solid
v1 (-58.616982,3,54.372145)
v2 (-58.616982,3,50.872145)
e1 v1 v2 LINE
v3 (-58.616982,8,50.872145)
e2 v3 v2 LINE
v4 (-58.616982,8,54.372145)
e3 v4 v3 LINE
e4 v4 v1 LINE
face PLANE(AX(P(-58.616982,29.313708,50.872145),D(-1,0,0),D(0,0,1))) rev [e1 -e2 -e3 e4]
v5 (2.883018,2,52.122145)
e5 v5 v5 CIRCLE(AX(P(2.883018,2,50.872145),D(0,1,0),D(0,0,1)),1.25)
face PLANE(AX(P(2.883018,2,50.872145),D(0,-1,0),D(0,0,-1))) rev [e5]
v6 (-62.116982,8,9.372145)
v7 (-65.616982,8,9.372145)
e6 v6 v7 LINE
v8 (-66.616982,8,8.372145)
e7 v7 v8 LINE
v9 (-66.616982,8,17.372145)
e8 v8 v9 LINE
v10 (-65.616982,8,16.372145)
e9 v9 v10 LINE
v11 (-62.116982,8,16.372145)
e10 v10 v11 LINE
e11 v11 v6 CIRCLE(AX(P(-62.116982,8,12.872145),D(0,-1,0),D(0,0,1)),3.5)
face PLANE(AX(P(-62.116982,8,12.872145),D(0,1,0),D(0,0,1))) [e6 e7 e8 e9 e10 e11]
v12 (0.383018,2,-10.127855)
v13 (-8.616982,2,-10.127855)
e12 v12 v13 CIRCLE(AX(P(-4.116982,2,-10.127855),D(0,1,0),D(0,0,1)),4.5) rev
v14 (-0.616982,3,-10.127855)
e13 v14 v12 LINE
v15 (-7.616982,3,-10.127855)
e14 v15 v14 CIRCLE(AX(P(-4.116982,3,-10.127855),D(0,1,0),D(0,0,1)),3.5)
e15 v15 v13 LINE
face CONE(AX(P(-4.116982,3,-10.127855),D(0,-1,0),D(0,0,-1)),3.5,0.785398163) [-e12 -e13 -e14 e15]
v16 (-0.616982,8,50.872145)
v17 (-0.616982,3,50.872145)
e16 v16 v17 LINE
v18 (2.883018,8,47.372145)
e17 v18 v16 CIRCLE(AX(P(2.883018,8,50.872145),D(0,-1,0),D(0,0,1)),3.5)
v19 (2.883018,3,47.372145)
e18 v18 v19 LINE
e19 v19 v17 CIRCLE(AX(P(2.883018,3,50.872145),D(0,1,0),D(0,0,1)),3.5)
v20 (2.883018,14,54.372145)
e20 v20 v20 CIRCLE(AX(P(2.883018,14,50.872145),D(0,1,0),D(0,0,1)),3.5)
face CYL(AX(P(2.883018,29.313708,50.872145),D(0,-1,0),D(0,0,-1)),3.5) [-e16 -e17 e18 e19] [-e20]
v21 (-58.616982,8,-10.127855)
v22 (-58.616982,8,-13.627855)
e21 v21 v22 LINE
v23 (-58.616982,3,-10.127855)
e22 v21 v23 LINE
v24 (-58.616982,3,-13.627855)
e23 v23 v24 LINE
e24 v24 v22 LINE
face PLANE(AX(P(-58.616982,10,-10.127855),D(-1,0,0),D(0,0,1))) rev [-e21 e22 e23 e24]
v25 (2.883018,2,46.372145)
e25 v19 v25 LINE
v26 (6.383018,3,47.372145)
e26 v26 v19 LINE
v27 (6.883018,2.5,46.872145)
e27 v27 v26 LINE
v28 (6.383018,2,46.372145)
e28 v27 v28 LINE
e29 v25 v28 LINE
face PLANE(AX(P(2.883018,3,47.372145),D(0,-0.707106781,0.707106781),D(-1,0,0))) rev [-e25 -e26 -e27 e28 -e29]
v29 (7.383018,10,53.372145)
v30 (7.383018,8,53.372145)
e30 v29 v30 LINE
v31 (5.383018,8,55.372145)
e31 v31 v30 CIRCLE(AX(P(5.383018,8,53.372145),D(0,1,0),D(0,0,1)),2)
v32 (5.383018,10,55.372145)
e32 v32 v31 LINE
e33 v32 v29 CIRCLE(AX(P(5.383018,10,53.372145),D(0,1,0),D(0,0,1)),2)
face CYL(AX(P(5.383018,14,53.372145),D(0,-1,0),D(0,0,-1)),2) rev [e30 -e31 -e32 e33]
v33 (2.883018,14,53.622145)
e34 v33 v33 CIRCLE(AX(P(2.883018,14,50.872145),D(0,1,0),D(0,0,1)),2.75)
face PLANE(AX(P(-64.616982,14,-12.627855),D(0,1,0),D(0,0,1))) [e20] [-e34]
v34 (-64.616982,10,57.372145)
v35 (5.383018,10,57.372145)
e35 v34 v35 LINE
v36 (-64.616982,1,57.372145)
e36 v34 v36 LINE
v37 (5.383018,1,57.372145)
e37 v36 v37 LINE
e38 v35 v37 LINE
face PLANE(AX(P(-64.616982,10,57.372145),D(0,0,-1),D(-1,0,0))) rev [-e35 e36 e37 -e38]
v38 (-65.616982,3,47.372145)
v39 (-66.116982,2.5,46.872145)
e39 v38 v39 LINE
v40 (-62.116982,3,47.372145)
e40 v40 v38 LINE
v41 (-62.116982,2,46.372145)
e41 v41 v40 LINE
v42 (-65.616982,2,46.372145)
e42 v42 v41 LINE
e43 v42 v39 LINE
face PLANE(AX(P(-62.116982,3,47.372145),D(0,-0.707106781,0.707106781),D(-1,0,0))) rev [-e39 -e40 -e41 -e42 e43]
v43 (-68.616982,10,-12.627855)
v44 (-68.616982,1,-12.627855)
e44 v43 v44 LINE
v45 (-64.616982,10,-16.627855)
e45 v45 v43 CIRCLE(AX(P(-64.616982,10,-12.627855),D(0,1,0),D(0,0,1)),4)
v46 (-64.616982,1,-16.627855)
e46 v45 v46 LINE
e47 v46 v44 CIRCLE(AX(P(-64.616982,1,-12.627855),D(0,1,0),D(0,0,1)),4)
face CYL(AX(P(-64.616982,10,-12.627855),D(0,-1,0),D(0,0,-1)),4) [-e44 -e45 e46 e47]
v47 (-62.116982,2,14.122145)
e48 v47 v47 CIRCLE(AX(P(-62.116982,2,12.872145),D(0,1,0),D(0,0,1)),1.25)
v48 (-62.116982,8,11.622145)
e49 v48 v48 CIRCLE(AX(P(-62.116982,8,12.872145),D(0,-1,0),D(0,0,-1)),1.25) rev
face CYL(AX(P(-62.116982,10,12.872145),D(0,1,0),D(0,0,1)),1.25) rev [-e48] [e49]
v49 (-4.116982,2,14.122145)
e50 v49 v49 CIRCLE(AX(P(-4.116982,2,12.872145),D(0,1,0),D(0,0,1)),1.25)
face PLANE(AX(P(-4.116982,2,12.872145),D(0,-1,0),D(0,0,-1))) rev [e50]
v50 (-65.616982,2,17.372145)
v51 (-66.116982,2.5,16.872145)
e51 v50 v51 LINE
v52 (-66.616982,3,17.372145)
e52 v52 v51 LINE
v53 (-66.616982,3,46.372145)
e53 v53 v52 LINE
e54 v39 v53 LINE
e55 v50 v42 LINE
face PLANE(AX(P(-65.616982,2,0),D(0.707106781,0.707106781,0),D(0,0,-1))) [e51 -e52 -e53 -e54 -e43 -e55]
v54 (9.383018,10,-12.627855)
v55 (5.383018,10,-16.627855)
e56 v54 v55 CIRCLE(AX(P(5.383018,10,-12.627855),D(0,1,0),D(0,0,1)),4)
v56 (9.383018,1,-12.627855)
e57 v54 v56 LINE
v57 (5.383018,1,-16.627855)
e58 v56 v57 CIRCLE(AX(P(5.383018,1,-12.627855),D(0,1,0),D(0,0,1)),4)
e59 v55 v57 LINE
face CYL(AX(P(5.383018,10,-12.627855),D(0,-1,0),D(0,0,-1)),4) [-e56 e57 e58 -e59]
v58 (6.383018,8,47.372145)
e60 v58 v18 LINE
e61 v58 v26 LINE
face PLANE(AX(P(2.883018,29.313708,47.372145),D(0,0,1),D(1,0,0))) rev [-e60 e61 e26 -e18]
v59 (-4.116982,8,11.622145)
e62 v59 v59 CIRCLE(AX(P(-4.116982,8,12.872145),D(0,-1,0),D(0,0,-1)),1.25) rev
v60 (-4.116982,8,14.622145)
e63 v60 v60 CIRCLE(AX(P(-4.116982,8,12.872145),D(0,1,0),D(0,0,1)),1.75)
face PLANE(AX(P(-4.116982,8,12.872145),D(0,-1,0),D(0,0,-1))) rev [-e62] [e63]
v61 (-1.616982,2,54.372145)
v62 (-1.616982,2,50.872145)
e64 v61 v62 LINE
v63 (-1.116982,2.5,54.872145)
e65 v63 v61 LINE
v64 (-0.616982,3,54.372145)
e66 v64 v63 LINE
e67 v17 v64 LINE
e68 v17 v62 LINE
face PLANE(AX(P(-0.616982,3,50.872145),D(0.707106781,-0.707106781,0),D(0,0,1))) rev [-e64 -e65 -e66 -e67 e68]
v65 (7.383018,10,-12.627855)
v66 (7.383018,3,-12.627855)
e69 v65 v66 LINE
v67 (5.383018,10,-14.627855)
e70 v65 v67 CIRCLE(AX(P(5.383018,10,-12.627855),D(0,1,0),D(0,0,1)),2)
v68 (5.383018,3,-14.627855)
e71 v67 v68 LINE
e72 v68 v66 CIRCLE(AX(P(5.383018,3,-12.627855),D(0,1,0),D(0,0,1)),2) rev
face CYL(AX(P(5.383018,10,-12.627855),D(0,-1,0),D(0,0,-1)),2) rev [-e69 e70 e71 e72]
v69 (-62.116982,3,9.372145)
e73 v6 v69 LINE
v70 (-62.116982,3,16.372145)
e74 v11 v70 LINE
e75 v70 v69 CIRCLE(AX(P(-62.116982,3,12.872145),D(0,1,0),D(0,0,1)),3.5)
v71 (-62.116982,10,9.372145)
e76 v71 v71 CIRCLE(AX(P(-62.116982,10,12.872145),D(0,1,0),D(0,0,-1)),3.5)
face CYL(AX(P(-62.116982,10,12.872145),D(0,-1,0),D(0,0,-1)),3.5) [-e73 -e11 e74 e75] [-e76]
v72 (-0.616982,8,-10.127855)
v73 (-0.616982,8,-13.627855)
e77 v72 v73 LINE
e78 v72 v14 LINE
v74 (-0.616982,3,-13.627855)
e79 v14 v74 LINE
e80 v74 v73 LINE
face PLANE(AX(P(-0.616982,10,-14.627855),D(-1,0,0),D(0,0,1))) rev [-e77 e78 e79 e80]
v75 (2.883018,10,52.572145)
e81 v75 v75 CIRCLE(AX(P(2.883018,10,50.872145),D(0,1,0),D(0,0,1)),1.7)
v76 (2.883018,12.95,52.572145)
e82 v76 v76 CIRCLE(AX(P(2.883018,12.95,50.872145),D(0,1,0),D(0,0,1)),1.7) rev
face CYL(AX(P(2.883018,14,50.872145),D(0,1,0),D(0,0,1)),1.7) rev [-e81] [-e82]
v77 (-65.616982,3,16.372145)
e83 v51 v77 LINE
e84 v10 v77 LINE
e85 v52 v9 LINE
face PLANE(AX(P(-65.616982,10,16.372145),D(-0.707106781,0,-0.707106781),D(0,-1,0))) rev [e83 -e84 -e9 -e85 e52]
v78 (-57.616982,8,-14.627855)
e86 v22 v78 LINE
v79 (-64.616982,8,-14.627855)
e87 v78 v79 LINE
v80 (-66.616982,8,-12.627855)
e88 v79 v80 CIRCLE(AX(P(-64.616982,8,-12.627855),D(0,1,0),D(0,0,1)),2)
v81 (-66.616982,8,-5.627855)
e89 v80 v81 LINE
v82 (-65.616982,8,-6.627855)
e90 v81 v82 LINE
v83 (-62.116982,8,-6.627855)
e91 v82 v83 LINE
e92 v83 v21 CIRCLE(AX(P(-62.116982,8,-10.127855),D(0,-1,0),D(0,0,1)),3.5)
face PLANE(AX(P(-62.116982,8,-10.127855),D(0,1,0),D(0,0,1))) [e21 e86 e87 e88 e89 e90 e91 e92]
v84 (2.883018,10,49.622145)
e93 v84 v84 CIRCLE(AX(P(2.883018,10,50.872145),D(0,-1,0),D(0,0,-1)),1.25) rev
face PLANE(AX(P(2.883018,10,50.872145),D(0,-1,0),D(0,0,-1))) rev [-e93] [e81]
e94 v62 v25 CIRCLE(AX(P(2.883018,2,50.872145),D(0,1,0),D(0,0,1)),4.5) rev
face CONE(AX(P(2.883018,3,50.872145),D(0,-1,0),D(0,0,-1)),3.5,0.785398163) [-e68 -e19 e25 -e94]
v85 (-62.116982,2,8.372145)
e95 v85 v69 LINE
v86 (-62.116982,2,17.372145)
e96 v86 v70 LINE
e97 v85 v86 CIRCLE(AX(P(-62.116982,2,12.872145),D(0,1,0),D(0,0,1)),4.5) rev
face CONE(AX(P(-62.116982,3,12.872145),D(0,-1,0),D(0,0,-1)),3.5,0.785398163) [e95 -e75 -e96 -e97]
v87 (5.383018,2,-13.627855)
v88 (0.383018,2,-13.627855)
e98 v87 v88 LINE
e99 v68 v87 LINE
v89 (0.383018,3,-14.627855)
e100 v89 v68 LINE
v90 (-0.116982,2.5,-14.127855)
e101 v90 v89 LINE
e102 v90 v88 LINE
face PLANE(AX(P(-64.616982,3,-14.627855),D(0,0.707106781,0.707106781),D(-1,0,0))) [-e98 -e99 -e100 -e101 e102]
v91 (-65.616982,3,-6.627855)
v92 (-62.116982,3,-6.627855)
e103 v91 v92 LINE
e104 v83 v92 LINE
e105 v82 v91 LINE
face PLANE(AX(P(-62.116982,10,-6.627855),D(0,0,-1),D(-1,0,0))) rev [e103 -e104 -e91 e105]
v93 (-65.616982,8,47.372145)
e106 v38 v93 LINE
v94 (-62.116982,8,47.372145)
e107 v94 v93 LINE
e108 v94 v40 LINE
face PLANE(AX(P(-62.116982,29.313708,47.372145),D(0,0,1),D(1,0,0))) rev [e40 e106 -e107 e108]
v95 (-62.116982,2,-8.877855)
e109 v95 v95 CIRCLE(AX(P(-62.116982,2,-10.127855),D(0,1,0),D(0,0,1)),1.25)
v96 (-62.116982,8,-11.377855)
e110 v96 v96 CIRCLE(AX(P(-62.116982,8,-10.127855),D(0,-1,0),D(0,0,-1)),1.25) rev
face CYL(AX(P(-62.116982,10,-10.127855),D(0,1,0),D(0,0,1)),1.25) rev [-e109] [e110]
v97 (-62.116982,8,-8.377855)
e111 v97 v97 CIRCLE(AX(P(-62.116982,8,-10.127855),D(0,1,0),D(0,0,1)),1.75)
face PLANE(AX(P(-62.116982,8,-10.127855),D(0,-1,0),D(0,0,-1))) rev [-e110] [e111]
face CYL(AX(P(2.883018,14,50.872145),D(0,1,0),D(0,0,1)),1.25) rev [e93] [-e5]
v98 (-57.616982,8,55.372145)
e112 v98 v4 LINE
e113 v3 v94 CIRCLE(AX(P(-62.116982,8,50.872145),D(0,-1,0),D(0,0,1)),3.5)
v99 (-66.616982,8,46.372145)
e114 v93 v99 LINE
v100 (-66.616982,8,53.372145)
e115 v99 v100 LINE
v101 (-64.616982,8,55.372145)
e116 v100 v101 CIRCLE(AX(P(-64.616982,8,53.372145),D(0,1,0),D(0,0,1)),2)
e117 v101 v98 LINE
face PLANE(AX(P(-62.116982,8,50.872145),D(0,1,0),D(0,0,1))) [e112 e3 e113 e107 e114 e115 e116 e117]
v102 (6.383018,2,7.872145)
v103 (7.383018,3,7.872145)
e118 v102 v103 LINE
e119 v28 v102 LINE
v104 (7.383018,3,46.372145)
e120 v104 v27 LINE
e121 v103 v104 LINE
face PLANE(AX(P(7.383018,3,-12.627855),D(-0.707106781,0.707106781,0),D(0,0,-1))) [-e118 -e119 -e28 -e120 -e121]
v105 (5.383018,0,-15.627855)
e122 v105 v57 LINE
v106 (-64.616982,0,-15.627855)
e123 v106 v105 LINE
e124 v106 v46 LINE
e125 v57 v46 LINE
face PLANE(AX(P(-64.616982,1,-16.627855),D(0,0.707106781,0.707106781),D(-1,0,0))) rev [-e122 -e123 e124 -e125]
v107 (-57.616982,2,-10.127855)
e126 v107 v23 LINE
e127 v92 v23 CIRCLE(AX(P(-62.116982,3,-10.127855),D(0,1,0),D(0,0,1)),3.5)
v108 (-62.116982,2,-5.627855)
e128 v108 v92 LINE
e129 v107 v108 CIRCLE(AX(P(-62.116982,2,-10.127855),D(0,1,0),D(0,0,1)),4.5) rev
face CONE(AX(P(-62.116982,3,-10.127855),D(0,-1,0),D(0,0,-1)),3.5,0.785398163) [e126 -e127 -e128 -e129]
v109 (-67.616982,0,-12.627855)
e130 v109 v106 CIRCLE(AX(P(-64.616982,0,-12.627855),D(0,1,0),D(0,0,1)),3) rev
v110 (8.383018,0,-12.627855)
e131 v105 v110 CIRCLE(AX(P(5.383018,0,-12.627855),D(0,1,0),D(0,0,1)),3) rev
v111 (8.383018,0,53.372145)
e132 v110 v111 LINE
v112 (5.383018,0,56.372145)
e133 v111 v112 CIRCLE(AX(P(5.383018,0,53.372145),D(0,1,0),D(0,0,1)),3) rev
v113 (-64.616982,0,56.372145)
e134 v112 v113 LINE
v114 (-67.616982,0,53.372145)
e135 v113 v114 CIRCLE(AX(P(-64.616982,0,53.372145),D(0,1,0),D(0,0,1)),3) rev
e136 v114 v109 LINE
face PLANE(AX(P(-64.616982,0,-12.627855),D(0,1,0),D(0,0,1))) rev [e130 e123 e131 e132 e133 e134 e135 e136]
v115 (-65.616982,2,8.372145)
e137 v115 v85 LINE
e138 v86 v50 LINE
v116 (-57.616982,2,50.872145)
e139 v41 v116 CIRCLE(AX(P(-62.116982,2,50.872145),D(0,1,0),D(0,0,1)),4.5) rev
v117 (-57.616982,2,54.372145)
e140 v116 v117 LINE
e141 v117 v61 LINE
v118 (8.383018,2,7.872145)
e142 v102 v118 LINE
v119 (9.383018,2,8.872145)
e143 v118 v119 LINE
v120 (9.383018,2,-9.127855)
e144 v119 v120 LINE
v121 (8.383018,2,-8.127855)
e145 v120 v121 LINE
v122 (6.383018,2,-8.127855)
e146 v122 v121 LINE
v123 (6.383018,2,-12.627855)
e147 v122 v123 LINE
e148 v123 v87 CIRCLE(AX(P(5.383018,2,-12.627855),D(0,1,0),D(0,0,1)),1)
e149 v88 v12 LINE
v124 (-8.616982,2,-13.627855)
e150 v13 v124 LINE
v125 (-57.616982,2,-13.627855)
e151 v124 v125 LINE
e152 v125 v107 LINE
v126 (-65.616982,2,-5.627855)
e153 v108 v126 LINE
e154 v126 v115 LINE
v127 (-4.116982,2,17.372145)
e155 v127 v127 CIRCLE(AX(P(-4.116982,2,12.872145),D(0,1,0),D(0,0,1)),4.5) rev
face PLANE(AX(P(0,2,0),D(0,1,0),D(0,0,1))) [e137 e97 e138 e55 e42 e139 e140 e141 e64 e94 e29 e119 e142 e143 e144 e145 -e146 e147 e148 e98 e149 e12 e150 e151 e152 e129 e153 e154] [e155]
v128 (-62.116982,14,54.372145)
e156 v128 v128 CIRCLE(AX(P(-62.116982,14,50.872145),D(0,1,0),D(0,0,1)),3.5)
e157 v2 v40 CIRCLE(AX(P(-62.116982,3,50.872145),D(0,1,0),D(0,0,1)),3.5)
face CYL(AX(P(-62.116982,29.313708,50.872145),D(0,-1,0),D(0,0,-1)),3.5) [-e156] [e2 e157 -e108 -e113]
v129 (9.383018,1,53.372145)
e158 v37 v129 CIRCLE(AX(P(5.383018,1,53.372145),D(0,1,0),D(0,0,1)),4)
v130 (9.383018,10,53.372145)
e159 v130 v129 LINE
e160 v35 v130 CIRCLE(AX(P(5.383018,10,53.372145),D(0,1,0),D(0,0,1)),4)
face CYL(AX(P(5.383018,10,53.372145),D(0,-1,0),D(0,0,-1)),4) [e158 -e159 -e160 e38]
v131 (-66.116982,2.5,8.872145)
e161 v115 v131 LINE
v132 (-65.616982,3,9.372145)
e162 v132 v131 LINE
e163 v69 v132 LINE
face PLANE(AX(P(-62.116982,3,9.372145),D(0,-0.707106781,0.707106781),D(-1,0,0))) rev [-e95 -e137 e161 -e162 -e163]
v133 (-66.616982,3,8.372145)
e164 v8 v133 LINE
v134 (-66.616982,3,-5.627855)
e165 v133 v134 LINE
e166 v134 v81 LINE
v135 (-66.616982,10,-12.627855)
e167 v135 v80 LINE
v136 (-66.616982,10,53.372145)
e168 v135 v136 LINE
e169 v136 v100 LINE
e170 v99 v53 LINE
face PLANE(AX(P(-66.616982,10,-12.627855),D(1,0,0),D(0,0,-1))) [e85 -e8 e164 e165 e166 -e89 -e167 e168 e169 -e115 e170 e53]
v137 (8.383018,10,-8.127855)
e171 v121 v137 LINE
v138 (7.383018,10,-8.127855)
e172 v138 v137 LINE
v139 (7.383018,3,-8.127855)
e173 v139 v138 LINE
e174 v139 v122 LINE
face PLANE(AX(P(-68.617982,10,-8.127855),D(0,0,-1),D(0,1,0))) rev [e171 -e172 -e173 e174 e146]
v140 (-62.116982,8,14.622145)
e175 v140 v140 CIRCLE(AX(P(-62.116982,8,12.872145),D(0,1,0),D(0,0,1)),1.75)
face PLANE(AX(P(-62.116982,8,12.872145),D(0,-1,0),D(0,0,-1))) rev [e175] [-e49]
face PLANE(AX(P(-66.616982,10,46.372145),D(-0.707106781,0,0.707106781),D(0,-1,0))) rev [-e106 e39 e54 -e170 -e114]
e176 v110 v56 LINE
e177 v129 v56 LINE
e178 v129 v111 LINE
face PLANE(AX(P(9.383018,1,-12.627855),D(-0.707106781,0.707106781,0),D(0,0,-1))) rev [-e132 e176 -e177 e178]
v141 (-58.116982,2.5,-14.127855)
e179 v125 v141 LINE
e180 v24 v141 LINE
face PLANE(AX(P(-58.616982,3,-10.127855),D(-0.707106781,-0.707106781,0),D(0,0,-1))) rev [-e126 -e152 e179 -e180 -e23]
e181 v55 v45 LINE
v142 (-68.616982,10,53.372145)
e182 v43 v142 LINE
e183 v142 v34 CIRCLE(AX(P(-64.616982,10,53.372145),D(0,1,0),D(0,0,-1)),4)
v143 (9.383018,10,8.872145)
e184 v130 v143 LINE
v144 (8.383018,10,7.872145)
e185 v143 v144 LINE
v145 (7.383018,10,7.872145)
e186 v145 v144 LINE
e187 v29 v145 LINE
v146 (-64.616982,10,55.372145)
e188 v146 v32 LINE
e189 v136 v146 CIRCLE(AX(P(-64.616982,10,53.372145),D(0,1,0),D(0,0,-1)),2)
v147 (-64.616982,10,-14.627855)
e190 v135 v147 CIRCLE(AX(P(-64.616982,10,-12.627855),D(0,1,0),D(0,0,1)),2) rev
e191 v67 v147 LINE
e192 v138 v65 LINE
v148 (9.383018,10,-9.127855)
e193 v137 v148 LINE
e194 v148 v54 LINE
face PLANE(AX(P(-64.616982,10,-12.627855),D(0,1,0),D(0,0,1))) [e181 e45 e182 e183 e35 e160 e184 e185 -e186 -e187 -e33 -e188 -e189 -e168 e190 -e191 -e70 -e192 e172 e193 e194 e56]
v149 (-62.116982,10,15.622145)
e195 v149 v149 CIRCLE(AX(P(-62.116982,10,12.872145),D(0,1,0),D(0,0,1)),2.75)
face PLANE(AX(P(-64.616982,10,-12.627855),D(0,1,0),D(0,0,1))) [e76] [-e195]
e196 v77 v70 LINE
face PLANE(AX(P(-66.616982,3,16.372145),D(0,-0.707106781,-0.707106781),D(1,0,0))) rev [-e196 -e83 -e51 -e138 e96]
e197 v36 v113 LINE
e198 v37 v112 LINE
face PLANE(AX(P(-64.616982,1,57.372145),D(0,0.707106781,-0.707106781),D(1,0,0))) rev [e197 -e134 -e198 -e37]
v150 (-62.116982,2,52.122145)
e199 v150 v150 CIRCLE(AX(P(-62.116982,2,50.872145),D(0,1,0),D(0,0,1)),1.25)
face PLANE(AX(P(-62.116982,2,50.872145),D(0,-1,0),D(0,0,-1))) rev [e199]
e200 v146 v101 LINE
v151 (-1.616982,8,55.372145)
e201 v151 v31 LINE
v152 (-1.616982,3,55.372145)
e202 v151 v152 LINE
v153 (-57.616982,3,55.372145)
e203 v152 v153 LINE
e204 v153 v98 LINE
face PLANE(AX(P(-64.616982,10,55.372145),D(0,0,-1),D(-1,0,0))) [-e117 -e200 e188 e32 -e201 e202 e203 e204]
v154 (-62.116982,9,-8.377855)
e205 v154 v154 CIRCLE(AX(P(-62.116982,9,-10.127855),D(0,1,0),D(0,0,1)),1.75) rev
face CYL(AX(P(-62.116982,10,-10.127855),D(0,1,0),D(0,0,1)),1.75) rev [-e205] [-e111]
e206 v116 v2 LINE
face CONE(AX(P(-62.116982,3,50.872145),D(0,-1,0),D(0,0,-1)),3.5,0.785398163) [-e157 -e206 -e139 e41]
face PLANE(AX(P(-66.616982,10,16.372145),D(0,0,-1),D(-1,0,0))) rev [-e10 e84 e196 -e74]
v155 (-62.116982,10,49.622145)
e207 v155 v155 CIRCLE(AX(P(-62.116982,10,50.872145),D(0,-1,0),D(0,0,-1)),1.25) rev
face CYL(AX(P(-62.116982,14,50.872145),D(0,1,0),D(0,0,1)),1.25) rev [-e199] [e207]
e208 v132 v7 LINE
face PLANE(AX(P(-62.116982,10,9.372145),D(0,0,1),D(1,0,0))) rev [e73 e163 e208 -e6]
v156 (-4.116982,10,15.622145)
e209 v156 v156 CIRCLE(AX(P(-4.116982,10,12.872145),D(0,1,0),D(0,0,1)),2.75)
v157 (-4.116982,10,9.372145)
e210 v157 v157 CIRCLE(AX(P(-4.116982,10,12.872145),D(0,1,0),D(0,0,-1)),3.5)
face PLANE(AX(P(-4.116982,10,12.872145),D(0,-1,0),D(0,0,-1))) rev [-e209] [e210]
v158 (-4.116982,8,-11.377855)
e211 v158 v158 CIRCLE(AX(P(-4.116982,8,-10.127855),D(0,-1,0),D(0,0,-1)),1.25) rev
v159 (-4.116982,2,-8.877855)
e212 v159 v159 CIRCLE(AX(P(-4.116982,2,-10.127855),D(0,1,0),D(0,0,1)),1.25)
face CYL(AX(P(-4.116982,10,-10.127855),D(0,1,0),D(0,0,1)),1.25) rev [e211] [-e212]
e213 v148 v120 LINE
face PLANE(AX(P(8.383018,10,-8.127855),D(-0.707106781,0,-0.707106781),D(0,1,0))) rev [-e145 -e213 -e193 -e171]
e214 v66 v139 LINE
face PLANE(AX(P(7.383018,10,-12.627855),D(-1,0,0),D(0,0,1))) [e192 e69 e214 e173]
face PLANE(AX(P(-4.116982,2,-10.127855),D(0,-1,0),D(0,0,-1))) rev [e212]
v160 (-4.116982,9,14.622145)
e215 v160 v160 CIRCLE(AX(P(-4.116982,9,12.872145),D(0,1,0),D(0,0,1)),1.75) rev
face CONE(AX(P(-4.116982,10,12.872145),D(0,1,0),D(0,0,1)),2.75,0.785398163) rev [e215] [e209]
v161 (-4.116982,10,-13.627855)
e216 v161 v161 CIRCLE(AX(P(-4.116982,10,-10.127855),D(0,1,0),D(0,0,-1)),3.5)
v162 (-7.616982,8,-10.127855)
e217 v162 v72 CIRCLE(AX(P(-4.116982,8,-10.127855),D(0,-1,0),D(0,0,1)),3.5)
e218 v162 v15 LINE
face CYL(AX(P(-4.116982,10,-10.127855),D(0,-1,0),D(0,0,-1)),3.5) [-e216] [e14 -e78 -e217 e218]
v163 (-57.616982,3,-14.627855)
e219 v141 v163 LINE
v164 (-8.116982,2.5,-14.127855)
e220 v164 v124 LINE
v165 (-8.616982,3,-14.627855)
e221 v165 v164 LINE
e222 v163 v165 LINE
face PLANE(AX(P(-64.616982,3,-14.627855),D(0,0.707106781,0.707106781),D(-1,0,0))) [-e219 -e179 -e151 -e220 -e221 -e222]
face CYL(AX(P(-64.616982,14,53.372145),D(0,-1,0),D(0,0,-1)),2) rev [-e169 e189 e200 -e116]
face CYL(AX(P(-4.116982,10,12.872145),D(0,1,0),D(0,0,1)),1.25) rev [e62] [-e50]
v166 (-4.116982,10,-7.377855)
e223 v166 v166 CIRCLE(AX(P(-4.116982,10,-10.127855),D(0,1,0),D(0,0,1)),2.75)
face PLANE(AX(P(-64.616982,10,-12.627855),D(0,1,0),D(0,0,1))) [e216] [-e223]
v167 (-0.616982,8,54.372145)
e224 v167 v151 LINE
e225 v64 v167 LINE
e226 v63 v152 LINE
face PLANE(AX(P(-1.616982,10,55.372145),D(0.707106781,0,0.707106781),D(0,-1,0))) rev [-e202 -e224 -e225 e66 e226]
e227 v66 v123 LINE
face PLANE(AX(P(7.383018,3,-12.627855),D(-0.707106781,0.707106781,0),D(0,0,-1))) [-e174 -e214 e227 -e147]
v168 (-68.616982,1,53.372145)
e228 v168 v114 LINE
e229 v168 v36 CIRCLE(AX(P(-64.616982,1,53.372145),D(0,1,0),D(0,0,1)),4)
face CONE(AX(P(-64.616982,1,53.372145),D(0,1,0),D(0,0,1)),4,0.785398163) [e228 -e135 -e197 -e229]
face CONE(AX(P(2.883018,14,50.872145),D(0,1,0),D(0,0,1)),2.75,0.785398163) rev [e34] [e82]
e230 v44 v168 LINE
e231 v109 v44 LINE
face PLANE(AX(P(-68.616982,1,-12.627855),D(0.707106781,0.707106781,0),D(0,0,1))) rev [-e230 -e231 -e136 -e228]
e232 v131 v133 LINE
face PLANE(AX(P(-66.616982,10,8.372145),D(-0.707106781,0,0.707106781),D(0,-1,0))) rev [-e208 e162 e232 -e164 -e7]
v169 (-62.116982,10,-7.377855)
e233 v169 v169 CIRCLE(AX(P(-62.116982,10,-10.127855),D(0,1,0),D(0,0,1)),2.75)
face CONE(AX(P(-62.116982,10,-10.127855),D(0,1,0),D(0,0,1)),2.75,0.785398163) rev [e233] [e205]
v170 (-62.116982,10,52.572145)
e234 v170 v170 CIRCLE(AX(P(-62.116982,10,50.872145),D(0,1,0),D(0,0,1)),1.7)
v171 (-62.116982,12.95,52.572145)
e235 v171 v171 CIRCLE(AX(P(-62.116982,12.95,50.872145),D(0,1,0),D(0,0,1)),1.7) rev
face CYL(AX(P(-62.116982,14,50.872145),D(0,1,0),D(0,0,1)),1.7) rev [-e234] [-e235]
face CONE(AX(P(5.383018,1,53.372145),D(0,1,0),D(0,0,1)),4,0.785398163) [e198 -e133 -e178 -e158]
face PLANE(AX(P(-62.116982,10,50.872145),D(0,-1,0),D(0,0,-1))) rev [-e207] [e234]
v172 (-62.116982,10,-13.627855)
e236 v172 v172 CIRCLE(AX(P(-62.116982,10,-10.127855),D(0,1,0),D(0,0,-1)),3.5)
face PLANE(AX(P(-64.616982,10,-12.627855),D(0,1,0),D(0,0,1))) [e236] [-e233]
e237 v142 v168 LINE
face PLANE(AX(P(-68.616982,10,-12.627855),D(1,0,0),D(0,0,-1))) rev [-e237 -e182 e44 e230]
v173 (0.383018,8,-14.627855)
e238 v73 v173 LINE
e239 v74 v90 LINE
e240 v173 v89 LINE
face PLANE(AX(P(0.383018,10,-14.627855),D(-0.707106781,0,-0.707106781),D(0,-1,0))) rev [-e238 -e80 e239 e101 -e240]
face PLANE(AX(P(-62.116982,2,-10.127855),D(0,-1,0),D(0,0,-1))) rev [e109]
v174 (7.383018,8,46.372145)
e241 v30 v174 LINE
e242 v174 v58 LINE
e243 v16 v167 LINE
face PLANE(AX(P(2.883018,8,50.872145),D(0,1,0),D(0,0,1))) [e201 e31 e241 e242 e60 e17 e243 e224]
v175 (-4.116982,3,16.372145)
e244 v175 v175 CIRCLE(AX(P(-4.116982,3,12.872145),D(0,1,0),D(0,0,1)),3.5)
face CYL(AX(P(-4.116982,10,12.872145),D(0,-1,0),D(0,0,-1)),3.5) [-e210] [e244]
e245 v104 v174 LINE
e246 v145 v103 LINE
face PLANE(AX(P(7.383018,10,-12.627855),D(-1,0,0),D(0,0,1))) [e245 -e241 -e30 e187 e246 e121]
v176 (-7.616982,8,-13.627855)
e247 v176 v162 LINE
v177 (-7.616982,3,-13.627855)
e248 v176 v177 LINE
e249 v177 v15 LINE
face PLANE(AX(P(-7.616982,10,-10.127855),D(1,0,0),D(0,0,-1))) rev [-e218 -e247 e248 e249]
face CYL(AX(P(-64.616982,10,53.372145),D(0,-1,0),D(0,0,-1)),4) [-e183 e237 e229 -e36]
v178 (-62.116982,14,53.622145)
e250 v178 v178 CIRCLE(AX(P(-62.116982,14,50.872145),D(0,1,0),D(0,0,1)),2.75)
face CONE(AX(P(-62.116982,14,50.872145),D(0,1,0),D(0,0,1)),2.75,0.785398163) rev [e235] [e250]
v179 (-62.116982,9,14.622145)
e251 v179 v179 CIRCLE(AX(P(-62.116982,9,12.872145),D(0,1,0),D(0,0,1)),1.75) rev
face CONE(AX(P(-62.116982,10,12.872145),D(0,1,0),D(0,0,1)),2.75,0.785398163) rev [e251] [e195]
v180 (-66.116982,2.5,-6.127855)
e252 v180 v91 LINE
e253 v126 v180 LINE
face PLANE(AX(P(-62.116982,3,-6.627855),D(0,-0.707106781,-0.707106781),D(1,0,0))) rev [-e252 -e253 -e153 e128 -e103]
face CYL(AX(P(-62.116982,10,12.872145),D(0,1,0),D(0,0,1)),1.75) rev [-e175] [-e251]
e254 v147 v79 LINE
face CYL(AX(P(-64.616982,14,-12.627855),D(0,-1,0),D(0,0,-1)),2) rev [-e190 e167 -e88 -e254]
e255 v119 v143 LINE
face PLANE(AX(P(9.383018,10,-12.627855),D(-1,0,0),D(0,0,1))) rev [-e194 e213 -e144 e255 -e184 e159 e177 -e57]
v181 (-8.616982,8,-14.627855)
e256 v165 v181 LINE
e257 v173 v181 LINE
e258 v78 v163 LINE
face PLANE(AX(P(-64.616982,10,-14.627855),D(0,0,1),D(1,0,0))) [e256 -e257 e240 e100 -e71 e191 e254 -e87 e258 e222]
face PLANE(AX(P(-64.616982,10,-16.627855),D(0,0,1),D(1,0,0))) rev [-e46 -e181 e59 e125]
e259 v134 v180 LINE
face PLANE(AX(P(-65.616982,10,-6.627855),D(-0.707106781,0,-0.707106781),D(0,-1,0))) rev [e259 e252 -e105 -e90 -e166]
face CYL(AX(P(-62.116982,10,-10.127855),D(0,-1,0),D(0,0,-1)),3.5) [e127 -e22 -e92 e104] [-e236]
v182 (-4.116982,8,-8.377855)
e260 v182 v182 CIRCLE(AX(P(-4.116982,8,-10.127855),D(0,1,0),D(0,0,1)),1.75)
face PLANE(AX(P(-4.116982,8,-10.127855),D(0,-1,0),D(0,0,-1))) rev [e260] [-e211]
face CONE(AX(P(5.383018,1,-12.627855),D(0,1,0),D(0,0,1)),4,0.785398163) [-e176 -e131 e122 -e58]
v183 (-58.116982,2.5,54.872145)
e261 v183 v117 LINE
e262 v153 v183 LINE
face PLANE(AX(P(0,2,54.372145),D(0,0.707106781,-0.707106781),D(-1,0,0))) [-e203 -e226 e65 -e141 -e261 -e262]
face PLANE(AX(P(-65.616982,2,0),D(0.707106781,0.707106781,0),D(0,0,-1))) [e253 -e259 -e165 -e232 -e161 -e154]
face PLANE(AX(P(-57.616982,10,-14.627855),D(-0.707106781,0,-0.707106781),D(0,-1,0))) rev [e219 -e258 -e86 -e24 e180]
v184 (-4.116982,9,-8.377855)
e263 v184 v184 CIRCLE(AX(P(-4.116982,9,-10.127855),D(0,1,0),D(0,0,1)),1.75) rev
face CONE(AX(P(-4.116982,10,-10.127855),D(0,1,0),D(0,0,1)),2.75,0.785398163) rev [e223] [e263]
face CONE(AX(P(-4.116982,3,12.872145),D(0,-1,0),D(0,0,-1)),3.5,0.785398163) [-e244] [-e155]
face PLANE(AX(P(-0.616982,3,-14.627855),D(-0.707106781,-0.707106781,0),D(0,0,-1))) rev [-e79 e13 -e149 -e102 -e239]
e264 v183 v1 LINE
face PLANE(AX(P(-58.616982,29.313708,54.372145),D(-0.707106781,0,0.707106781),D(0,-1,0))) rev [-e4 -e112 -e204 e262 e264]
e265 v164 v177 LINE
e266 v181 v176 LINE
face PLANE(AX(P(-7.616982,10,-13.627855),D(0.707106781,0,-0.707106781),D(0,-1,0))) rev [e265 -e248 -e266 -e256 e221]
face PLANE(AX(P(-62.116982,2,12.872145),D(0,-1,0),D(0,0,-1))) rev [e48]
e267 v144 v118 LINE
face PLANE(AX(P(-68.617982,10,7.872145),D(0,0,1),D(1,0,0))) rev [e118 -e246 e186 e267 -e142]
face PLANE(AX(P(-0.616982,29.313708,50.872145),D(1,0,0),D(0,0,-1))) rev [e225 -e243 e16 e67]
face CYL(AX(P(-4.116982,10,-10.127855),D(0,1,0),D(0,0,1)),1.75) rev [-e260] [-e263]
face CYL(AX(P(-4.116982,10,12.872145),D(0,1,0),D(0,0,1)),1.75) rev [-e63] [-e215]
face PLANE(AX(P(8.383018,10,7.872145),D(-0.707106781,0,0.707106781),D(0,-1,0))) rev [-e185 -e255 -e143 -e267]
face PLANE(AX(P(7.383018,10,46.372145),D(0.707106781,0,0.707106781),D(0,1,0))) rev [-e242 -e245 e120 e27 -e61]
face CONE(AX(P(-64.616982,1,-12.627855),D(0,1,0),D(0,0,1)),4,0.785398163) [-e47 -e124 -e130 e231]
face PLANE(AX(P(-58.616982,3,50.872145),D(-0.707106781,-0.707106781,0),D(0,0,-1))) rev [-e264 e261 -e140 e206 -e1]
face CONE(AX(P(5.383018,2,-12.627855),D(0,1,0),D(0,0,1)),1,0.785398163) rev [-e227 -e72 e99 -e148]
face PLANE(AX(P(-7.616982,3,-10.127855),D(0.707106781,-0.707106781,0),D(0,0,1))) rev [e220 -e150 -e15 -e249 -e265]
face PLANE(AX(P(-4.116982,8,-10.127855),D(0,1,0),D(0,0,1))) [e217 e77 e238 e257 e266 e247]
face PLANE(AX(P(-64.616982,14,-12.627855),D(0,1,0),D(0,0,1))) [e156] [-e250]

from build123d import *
from build123d.topology import SkipClean

# Parameters (mm, degrees)
BOSS_EXTRUDE1_DEPTH                  = 10
BOSS_EXTRUDE2_DEPTH                  = 2
SKETCH4_R                            = 3.5
BOSS_EXTRUDE3_DEPTH                  = 8
BOSS_EXTRUDE4_DEPTH                  = 12
CHAMFER3_SIZE                        = 1
CUT_EXTRUDE2_DEPTH                   = 4
CUT_EXTRUDE2_DEPTH_BACK              = 2
CHAMFER4_SIZE                        = 1
CHAMFER5_SIZE                        = 1
F_2_5_2_5_DIAMETER_HOLE1_D           = 2.5
F_2_5_2_5_DIAMETER_HOLE1_DEPTH       = 8
F_2_5_2_5_DIAMETER_HOLE1_CSINK_D     = 5.5
F_2_5_2_5_DIAMETER_HOLE1_CSINK_ANGLE = 90
F_3_5_3_5_DIAMETER_HOLE1_D           = 3.5
F_3_5_3_5_DIAMETER_HOLE1_DEPTH       = 2
F_2_5_2_5_DIAMETER_HOLE2_D           = 2.5
F_2_5_2_5_DIAMETER_HOLE2_DEPTH       = 12
F_2_5_2_5_DIAMETER_HOLE2_CSINK_D     = 5.5
F_2_5_2_5_DIAMETER_HOLE2_CSINK_ANGLE = 90
F_3_4_3_4_DIAMETER_HOLE1_D           = 3.4
F_3_4_3_4_DIAMETER_HOLE1_DEPTH       = 4
CUT_EXTRUDE3_REACH                   = 99.834
SKETCH21_W                           = 16
SKETCH21_H                           = 8
CHAMFER9_SIZE                        = 1


with BuildPart() as part:
    # Sketch2 → Boss-Extrude1 (new body)
    with BuildSketch(Plane(origin=(0, 0, 0), x_dir=(1, 0, 0), z_dir=(0, 1, 0))):
        with BuildLine():
            Line((-68.616981764, 12.627854819), (-68.616981764, -53.372145181))
            ThreePointArc((-68.616981764, -53.372145181), (-67.445408889, -56.200572306), (-64.616981764, -57.372145181))
            Line((-64.616981764, -57.372145181), (5.383018236, -57.372145181))
            ThreePointArc((5.383018236, -57.372145181), (8.211445361, -56.200572306), (9.383018236, -53.372145181))
            Line((9.383018236, -53.372145181), (9.383018236, 12.627854819))
            ThreePointArc((9.383018236, 12.627854819), (8.211445361, 15.456281944), (5.383018236, 16.627854819))
            Line((5.383018236, 16.627854819), (-64.616981764, 16.627854819))
            ThreePointArc((-64.616981764, 16.627854819), (-67.445408889, 15.456281944), (-68.616981764, 12.627854819))
        make_face()
        with BuildLine():
            Line((-66.616981764, 12.627854819), (-66.616981764, -53.372145181))
            ThreePointArc((-66.616981764, -53.372145181), (-66.031195326, -54.786358744), (-64.616981764, -55.372145181))
            Line((-64.616981764, -55.372145181), (5.383018236, -55.372145181))
            ThreePointArc((5.383018236, -55.372145181), (6.797231798, -54.786358744), (7.383018236, -53.372145181))
            Line((7.383018236, -53.372145181), (7.383018236, 12.627854819))
            ThreePointArc((7.383018236, 12.627854819), (6.797231798, 14.042068381), (5.383018236, 14.627854819))
            Line((5.383018236, 14.627854819), (-64.616981764, 14.627854819))
            ThreePointArc((-64.616981764, 14.627854819), (-66.031195326, 14.042068381), (-66.616981764, 12.627854819))
        make_face(mode=Mode.SUBTRACT)
    extrude(amount=BOSS_EXTRUDE1_DEPTH)

    # Sketch2<3> → Boss-Extrude2 (add)
    with BuildSketch(Plane(origin=(0, 0, 0), x_dir=(1, 0, 0), z_dir=(0, 1, 0))):
        with BuildLine():
            Line((-64.616981764, 14.627854819), (5.383018236, 14.627854819))
            ThreePointArc((5.383018236, 14.627854819), (6.797231798, 14.042068381), (7.383018236, 12.627854819))
            Line((7.383018236, 12.627854819), (7.383018236, -53.372145181))
            ThreePointArc((7.383018236, -53.372145181), (6.797231798, -54.786358744), (5.383018236, -55.372145181))
            Line((5.383018236, -55.372145181), (-64.616981764, -55.372145181))
            ThreePointArc((-64.616981764, -55.372145181), (-66.031195326, -54.786358744), (-66.616981764, -53.372145181))
            Line((-66.616981764, -53.372145181), (-66.616981764, 12.627854819))
            ThreePointArc((-66.616981764, 12.627854819), (-66.031195326, 14.042068381), (-64.616981764, 14.627854819))
        make_face()
    extrude(amount=BOSS_EXTRUDE2_DEPTH)

    # Sketch4 → Boss-Extrude3 (add)
    with BuildSketch(Plane(origin=(0, 2, 0), x_dir=(1, 0, 0), z_dir=(0, 1, 0))):
        with Locations(Location((-4.116981764, -12.872145181, 0), (0, 0, 90))):
            Circle(SKETCH4_R)
        with BuildLine():
            Line((-0.616981764, 14.627854819), (-0.616981764, 10.127854819))
            ThreePointArc((-0.616981764, 10.127854819), (-4.116981764, 6.627854819), (-7.616981764, 10.127854819))
            Line((-7.616981764, 10.127854819), (-7.616981764, 14.627854819))
            Line((-7.616981764, 14.627854819), (-0.616981764, 14.627854819))
        make_face()
        with BuildLine():
            Line((-66.616981764, -16.372145181), (-62.116981764, -16.372145181))
            ThreePointArc((-62.116981764, -16.372145181), (-58.616981764, -12.872145181), (-62.116981764, -9.372145181))
            Line((-62.116981764, -9.372145181), (-66.616981764, -9.372145181))
            Line((-66.616981764, -9.372145181), (-66.616981764, -16.372145181))
        make_face()
        with BuildLine():
            Line((-58.616981764, 14.627854819), (-64.616981764, 14.627854819))
            ThreePointArc((-64.616981764, 14.627854819), (-66.031195326, 14.042068381), (-66.616981764, 12.627854819))
            Line((-66.616981764, 12.627854819), (-66.616981764, 6.627854819))
            Line((-66.616981764, 6.627854819), (-62.116981764, 6.627854819))
            ThreePointArc((-62.116981764, 6.627854819), (-59.64210803, 7.652981085), (-58.616981764, 10.127854819))
            Line((-58.616981764, 10.127854819), (-58.616981764, 14.627854819))
        make_face()
    extrude(amount=BOSS_EXTRUDE3_DEPTH)

    # Sketch9 → Boss-Extrude4 (add)
    with BuildSketch(Plane(origin=(0, 2, 0), x_dir=(1, 0, 0), z_dir=(0, 1, 0))):
        with BuildLine():
            Line((-62.116981764, -47.372145181), (-66.616981764, -47.372145181))
            Line((-66.616981764, -47.372145181), (-66.616981764, -53.372145181))
            ThreePointArc((-66.616981764, -53.372145181), (-66.031195326, -54.786358744), (-64.616981764, -55.372145181))
            Line((-64.616981764, -55.372145181), (-58.616981764, -55.372145181))
            Line((-58.616981764, -55.372145181), (-58.616981764, -50.872145181))
            ThreePointArc((-58.616981764, -50.872145181), (-59.64210803, -48.397271447), (-62.116981764, -47.372145181))
        make_face()
        with BuildLine():
            Line((2.883018236, -47.372145181), (7.383018236, -47.372145181))
            Line((7.383018236, -47.372145181), (7.383018236, -53.372145181))
            ThreePointArc((7.383018236, -53.372145181), (6.797231798, -54.786358744), (5.383018236, -55.372145181))
            Line((5.383018236, -55.372145181), (-0.616981764, -55.372145181))
            Line((-0.616981764, -55.372145181), (-0.616981764, -50.872145181))
            ThreePointArc((-0.616981764, -50.872145181), (0.408144502, -48.397271447), (2.883018236, -47.372145181))
        make_face()
    extrude(amount=BOSS_EXTRUDE4_DEPTH)

    # Chamfer3
    chamfer3_edges = [part.edges().sort_by_distance(p)[0] for p in [
        (-68.616981764, 0, 20.372145181),
        (-67.445408889, 0, -15.456281944),
        (-29.616981764, 0, -16.627854819),
        (8.211445361, 0, -15.456281944),
        (9.383018236, 0, 20.372145181),
        (8.211445361, 0, 56.200572306),
        (-29.616981764, 0, 57.372145181),
        (-67.445408889, 0, 56.200572306),
    ]]
    chamfer(chamfer3_edges, length=CHAMFER3_SIZE)

    # Sketch12 → Cut-Extrude2 (cut, two sides: drawn at the far end of the back side and taken through both)
    with SkipClean():  # the faces are left unmerged after this step: merging them gives an invalid solid
        with BuildSketch(Plane(origin=(0, 10, 0), x_dir=(1, 0, 0), z_dir=(0, 1, 0)).offset(-CUT_EXTRUDE2_DEPTH_BACK)):
            with BuildLine():
                Line((-58.616981764, 10.127854819), (-58.616981764, 14.627854819))
                Line((-58.616981764, 14.627854819), (-64.616981764, 14.627854819))
                ThreePointArc((-64.616981764, 14.627854819), (-66.031195326, 14.042068381), (-66.616981764, 12.627854819))
                Line((-66.616981764, 12.627854819), (-66.616981764, 6.627854819))
                Line((-66.616981764, 6.627854819), (-62.116981764, 6.627854819))
                ThreePointArc((-62.116981764, 6.627854819), (-64.591855498, 12.602728553), (-58.616981764, 10.127854819))
            make_face()
            with BuildLine():
                Line((-64.616981764, -55.372145181), (-58.616981764, -55.372145181))
                Line((-58.616981764, -55.372145181), (-58.616981764, -50.872145181))
                ThreePointArc((-58.616981764, -50.872145181), (-64.591855498, -53.347018915), (-62.116981764, -47.372145181))
                Line((-62.116981764, -47.372145181), (-66.616981764, -47.372145181))
                Line((-66.616981764, -47.372145181), (-66.616981764, -53.372145181))
                ThreePointArc((-66.616981764, -53.372145181), (-66.031195326, -54.786358744), (-64.616981764, -55.372145181))
            make_face()
            with BuildLine():
                Line((-0.616981764, -50.872145181), (-0.616981764, -55.372145181))
                Line((-0.616981764, -55.372145181), (5.383018236, -55.372145181))
                ThreePointArc((5.383018236, -55.372145181), (6.797231798, -54.786358744), (7.383018236, -53.372145181))
                Line((7.383018236, -53.372145181), (7.383018236, -47.372145181))
                Line((7.383018236, -47.372145181), (2.883018236, -47.372145181))
                ThreePointArc((2.883018236, -47.372145181), (5.35789197, -53.347018915), (-0.616981764, -50.872145181))
            make_face()
            with BuildLine():
                Line((-7.616981764, 10.127854819), (-7.616981764, 14.627854819))
                Line((-7.616981764, 14.627854819), (-0.616981764, 14.627854819))
                Line((-0.616981764, 14.627854819), (-0.616981764, 10.127854819))
                ThreePointArc((-0.616981764, 10.127854819), (-4.116981764, 13.627854819), (-7.616981764, 10.127854819))
            make_face()
            with BuildLine():
                Line((-66.616981764, -16.372145181), (-66.616981764, -9.372145181))
                Line((-66.616981764, -9.372145181), (-62.116981764, -9.372145181))
                ThreePointArc((-62.116981764, -9.372145181), (-65.616981764, -12.872145181), (-62.116981764, -16.372145181))
                Line((-62.116981764, -16.372145181), (-66.616981764, -16.372145181))
            make_face()
        extrude(amount=CUT_EXTRUDE2_DEPTH + CUT_EXTRUDE2_DEPTH_BACK, mode=Mode.SUBTRACT)

    # Chamfer4
    # the kernel refuses this chamfer: 1 mm, written as the material it adds along each edge
    with BuildSketch(Plane(origin=(7.383018236, 2, 47.372145181), x_dir=(0.027495876610586414, 0, -0.9996219169112968), z_dir=(0, 1, 0)), Plane(origin=(-66.616981764, 2, -6.627854819), x_dir=(-0.02749587661058217, 0, 0.9996219169112968), z_dir=(0, 1, 0)), Plane(origin=(-58.616981764, 2, 55.372145181), x_dir=(0.9996219169112968, 0, 0.027495876610589005), z_dir=(0, 1, 0)), Plane(origin=(-7.616981764, 2, -14.627854819), x_dir=(-0.9996219169112968, 0, -0.027495876610585623), z_dir=(0, 1, 0)), Plane(origin=(-66.616981764, 2, 16.372145181), x_dir=(-0.027495876610582105, 0, 0.999621916911297), z_dir=(0, 1, 0))) as chamfer4_piece_1:
        Polygon((CHAMFER4_SIZE * 0.999621916911, CHAMFER4_SIZE * 0.0274958766106), (-CHAMFER4_SIZE * 0.0274958766106, CHAMFER4_SIZE * 0.999621916911), (0, 0), align=None)
    extrude(amount=6)
    with BuildSketch(Plane(origin=(-58.616981764, 2, -14.627854819), x_dir=(0.9996219169112968, 0, -0.02749587661058555), z_dir=(0, 1, 0)), Plane(origin=(-66.616981764, 2, 47.372145181), x_dir=(-0.027495876610582105, 0, -0.999621916911297), z_dir=(0, 1, 0)), Plane(origin=(-0.616981764, 2, 55.372145181), x_dir=(-0.9996219169112965, 0, 0.027495876610589158), z_dir=(0, 1, 0)), Plane(origin=(-0.616981764, 2, -14.627854819), x_dir=(0.9996219169112968, 0, -0.027495876610585623), z_dir=(0, 1, 0)), Plane(origin=(-66.616981764, 2, 9.372145181), x_dir=(-0.0274958766105822, 0, -0.999621916911297), z_dir=(0, 1, 0))) as chamfer4_piece_2:
        Polygon((CHAMFER4_SIZE * 0.999621916911, -CHAMFER4_SIZE * 0.0274958766106), (-CHAMFER4_SIZE * 0.0274958766106, -CHAMFER4_SIZE * 0.999621916911), (0, 0), align=None)
    extrude(amount=6)

    # Chamfer5
    # the kernel refuses this chamfer: 1 mm, written as the material it adds along each edge
    with BuildSketch(Plane(origin=(-58.616981764, 2, 56.943828169), x_dir=(-0.02749587661058907, 0.9996219169112965, 0), z_dir=(0, 0, -1)), Plane(origin=(-62.116981764, 2, 47.372145181), x_dir=(0, 0.9996219169112968, 0.027495876610589075), z_dir=(-1, 0, 0)), Plane(origin=(-7.616981764, 2, -10.127854819), x_dir=(-0.9996219169112968, -0.02749587661058627, 0), z_dir=(0, 0, -1)), Plane(origin=(-0.616981764, 2, -16.199537807), x_dir=(0.9996219169112968, -0.027495876610586487, 0), z_dir=(0, 0, 1)), Plane(origin=(-68.188664752, 2, -6.627854819), x_dir=(0, 0.9996219169112968, -0.027495876610586487), z_dir=(1, 0, 0)), Plane(origin=(-68.188664752, 2, 16.372145181), x_dir=(0, 0.9996219169112968, -0.027495876610585623), z_dir=(1, 0, 0)), Plane(origin=(-62.116981764, 2, 9.372145181), x_dir=(0, 0.9996219169112968, 0.027495876610585623), z_dir=(-1, 0, 0))) as chamfer5_piece_1:
        Polygon((CHAMFER5_SIZE * 0.999621916911, CHAMFER5_SIZE * 0.0274958766106), (-CHAMFER5_SIZE * 0.0274958766106, CHAMFER5_SIZE * 0.999621916911), (0, 0), align=None)
    extrude(amount=6.071682988)
    with BuildSketch(Plane(origin=(-62.116981764, 2, 50.872145181), x_dir=(1, 0, 0), z_dir=(0, 0, 1))) as chamfer5_piece_2:
        Polygon((3.5, CHAMFER5_SIZE), (3.5 + CHAMFER5_SIZE, 0), (3.5, 0), align=None)
    revolve(axis=Axis((-62.116981764, 2, 50.872145181), (0, 1, 0)), revolution_arc=90)
    with BuildSketch(Plane(origin=(0.954701224, 2, 55.372145181), x_dir=(0, 0.9996219169112968, 0.027495876610589075), z_dir=(-1, 0, 0))) as chamfer5_piece_3:
        Polygon((CHAMFER5_SIZE * 0.999621916911, CHAMFER5_SIZE * 0.0274958766106), (-CHAMFER5_SIZE * 0.0274958766106, CHAMFER5_SIZE * 0.999621916911), (0, 0), align=None)
    extrude(amount=61.143365976)
    with BuildSketch(Plane(origin=(2.883018236, 2, 47.372145181), x_dir=(0, 0.9996219169112968, 0.027495876610589075), z_dir=(1, 0, 0)), Plane(origin=(-0.616981764, 2, 56.943828169), x_dir=(0.02749587661058638, 0.9996219169112968, 0), z_dir=(0, 0, -1)), Plane(origin=(-58.616981764, 2, -10.127854819), x_dir=(0.9996219169112968, -0.0274958766105862, 0), z_dir=(0, 0, -1))) as chamfer5_piece_4:
        Polygon((CHAMFER5_SIZE * 0.999621916911, -CHAMFER5_SIZE * 0.0274958766106), (-CHAMFER5_SIZE * 0.0274958766106, -CHAMFER5_SIZE * 0.999621916911), (0, 0), align=None)
    extrude(amount=6.071682988)
    with BuildSketch(Plane(origin=(2.883018236, 2, 50.872145181), x_dir=(-1, 0, 0), z_dir=(0, 0, 1))) as chamfer5_piece_5:
        Polygon((3.5, -CHAMFER5_SIZE), (3.5 + CHAMFER5_SIZE, 0), (3.5, 0), align=None)
    revolve(axis=Axis((2.883018236, 2, 50.872145181), (0, -1, 0)), revolution_arc=90)
    with BuildSketch(Plane(origin=(-4.116981764, 2, 12.872145181), x_dir=(0, 0, -1), z_dir=(1, 0, 0))) as chamfer5_piece_6:
        Polygon((3.5 + CHAMFER5_SIZE, 0), (3.5, CHAMFER5_SIZE), (3.5, 0), align=None)
    revolve(axis=Axis((-4.116981764, 2, 12.872145181), (0, 1, 0)))
    with BuildSketch(Plane(origin=(7.383018236, 2, -12.627854819), x_dir=(0.02749587661059166, 0.9996219169112965, 0), z_dir=(0, 0, 1))) as chamfer5_piece_7:
        Polygon((CHAMFER5_SIZE * 0.999621916911, CHAMFER5_SIZE * 0.0274958766106), (-CHAMFER5_SIZE * 0.0274958766106, CHAMFER5_SIZE * 0.999621916911), (0, 0), align=None)
    extrude(amount=61.571682988)
    with BuildSketch(Plane(origin=(-2.188664752, 2, -14.627854819), x_dir=(0, -0.02749587661058651, 0.9996219169112968), z_dir=(1, 0, 0))) as chamfer5_piece_8:
        Polygon((CHAMFER5_SIZE * 0.999621916911, -CHAMFER5_SIZE * 0.0274958766106), (-CHAMFER5_SIZE * 0.0274958766106, -CHAMFER5_SIZE * 0.999621916911), (0, 0), align=None)
    extrude(amount=7.571682988)
    with BuildSketch(Plane(origin=(5.383018236, 2, -12.627854819), x_dir=(0, 0, -1), z_dir=(-1, 0, 0))) as chamfer5_piece_9:
        Polygon((2, -CHAMFER5_SIZE), (2 - CHAMFER5_SIZE, 0), (2, 0), align=None)
    revolve(axis=Axis((5.383018236, 2, -12.627854819), (0, -1, 0)), revolution_arc=90)
    with BuildSketch(Plane(origin=(-4.116981764, 2, -10.127854819), x_dir=(1, 0, 0), z_dir=(0, 0, -1))) as chamfer5_piece_10:
        Polygon((3.5 + CHAMFER5_SIZE, 0), (3.5, -CHAMFER5_SIZE), (3.5, 0), align=None)
    revolve(axis=Axis((-4.116981764, 2, -10.127854819), (0, -1, 0)), revolution_arc=180)
    with BuildSketch(Plane(origin=(-60.188664752, 2, -14.627854819), x_dir=(0, -0.02749587661058651, 0.9996219169112968), z_dir=(1, 0, 0))) as chamfer5_piece_11:
        Polygon((CHAMFER5_SIZE * 0.999621916911, -CHAMFER5_SIZE * 0.0274958766106), (-CHAMFER5_SIZE * 0.0274958766106, -CHAMFER5_SIZE * 0.999621916911), (0, 0), align=None)
    extrude(amount=54.143365976)
    with BuildSketch(Plane(origin=(-62.116981764, 2, -10.127854819), x_dir=(0, 0, 1), z_dir=(-1, 0, 0))) as chamfer5_piece_12:
        Polygon((3.5, CHAMFER5_SIZE), (3.5 + CHAMFER5_SIZE, 0), (3.5, 0), align=None)
    revolve(axis=Axis((-62.116981764, 2, -10.127854819), (0, 1, 0)), revolution_arc=90)
    with BuildSketch(Plane(origin=(-66.616981764, 2, 10.943828169), x_dir=(-0.02749587661058217, 0.9996219169112968, 0), z_dir=(0, 0, -1))) as chamfer5_piece_13:
        Polygon((CHAMFER5_SIZE * 0.999621916911, CHAMFER5_SIZE * 0.0274958766106), (-CHAMFER5_SIZE * 0.0274958766106, CHAMFER5_SIZE * 0.999621916911), (0, 0), align=None)
    extrude(amount=19.143365976)
    with BuildSketch(Plane(origin=(-62.116981764, 2, 12.872145181), x_dir=(0, 0, 1), z_dir=(-1, 0, 0))) as chamfer5_piece_14:
        Polygon((3.5, CHAMFER5_SIZE), (3.5 + CHAMFER5_SIZE, 0), (3.5, 0), align=None)
    revolve(axis=Axis((-62.116981764, 2, 12.872145181), (0, 1, 0)), revolution_arc=180)
    with BuildSketch(Plane(origin=(-66.616981764, 2, 48.943828169), x_dir=(-0.02749587661058217, 0.9996219169112968, 0), z_dir=(0, 0, -1))) as chamfer5_piece_15:
        Polygon((CHAMFER5_SIZE * 0.999621916911, CHAMFER5_SIZE * 0.0274958766106), (-CHAMFER5_SIZE * 0.0274958766106, CHAMFER5_SIZE * 0.999621916911), (0, 0), align=None)
    extrude(amount=34.143365976)

    # Ø2.5 (2.5) Diameter Hole1
    with Locations(Plane(origin=(0, 10, 0), x_dir=(1, 0, 0), z_dir=(0, 1, 0))):
        with Locations((-62.116981764, 10.127854819), (-4.116981764, 10.127854819), (-62.116981764, -12.872145181), (-4.116981764, -12.872145181)):
            CounterSinkHole(F_2_5_2_5_DIAMETER_HOLE1_D / 2, F_2_5_2_5_DIAMETER_HOLE1_CSINK_D / 2, depth=F_2_5_2_5_DIAMETER_HOLE1_DEPTH, counter_sink_angle=F_2_5_2_5_DIAMETER_HOLE1_CSINK_ANGLE)

    # Ø3.5 (3.5) Diameter Hole1
    with Locations(Plane(origin=(0, 10, 0), x_dir=(1, 0, 0), z_dir=(0, 1, 0))):
        with Locations((-62.116981764, 10.127854819), (-4.116981764, 10.127854819), (-62.116981764, -12.872145181), (-4.116981764, -12.872145181)):
            Hole(F_3_5_3_5_DIAMETER_HOLE1_D / 2, depth=F_3_5_3_5_DIAMETER_HOLE1_DEPTH)

    # Ø2.5 (2.5) Diameter Hole2
    with Locations(Plane(origin=(0, 14, 0), x_dir=(1, 0, 0), z_dir=(0, 1, 0))):
        with Locations((-62.116981764, -50.872145181), (2.883018236, -50.872145181)):
            CounterSinkHole(F_2_5_2_5_DIAMETER_HOLE2_D / 2, F_2_5_2_5_DIAMETER_HOLE2_CSINK_D / 2, depth=F_2_5_2_5_DIAMETER_HOLE2_DEPTH, counter_sink_angle=F_2_5_2_5_DIAMETER_HOLE2_CSINK_ANGLE)

    # Ø3.4 (3.4) Diameter Hole1
    with Locations(Plane(origin=(0, 14, 0), x_dir=(1, 0, 0), z_dir=(0, 1, 0))):
        with Locations((-62.116981764, -50.872145181), (2.883018236, -50.872145181)):
            Hole(F_3_4_3_4_DIAMETER_HOLE1_D / 2, depth=F_3_4_3_4_DIAMETER_HOLE1_DEPTH)

    # Sketch21 → Cut-Extrude3 (cut, up to next)
    with BuildSketch(Plane(origin=(9.383018236, 0, 0), x_dir=(0, 0, -1), z_dir=(1, 0, 0)), mode=Mode.PRIVATE) as cut_extrude3_sk1:
        with Locations((0.127854819, 6)):
            Rectangle(SKETCH21_W, SKETCH21_H)
    cut_extrude3_tool1 = extrude(cut_extrude3_sk1.sketch, amount=-CUT_EXTRUDE3_REACH, mode=Mode.PRIVATE) & part.part
    add(cut_extrude3_tool1.solids().sort_by_distance((9.383018, 6, -0.127855))[0], mode=Mode.SUBTRACT)

    # Chamfer9
    chamfer9_edges = [part.edges().sort_by_distance(p)[0] for p in [
        (9.383018236, 6, 7.872145181),
        (9.383018236, 6, -8.127854819),
    ]]
    chamfer(chamfer9_edges, length=CHAMFER9_SIZE)


solid = part.part
